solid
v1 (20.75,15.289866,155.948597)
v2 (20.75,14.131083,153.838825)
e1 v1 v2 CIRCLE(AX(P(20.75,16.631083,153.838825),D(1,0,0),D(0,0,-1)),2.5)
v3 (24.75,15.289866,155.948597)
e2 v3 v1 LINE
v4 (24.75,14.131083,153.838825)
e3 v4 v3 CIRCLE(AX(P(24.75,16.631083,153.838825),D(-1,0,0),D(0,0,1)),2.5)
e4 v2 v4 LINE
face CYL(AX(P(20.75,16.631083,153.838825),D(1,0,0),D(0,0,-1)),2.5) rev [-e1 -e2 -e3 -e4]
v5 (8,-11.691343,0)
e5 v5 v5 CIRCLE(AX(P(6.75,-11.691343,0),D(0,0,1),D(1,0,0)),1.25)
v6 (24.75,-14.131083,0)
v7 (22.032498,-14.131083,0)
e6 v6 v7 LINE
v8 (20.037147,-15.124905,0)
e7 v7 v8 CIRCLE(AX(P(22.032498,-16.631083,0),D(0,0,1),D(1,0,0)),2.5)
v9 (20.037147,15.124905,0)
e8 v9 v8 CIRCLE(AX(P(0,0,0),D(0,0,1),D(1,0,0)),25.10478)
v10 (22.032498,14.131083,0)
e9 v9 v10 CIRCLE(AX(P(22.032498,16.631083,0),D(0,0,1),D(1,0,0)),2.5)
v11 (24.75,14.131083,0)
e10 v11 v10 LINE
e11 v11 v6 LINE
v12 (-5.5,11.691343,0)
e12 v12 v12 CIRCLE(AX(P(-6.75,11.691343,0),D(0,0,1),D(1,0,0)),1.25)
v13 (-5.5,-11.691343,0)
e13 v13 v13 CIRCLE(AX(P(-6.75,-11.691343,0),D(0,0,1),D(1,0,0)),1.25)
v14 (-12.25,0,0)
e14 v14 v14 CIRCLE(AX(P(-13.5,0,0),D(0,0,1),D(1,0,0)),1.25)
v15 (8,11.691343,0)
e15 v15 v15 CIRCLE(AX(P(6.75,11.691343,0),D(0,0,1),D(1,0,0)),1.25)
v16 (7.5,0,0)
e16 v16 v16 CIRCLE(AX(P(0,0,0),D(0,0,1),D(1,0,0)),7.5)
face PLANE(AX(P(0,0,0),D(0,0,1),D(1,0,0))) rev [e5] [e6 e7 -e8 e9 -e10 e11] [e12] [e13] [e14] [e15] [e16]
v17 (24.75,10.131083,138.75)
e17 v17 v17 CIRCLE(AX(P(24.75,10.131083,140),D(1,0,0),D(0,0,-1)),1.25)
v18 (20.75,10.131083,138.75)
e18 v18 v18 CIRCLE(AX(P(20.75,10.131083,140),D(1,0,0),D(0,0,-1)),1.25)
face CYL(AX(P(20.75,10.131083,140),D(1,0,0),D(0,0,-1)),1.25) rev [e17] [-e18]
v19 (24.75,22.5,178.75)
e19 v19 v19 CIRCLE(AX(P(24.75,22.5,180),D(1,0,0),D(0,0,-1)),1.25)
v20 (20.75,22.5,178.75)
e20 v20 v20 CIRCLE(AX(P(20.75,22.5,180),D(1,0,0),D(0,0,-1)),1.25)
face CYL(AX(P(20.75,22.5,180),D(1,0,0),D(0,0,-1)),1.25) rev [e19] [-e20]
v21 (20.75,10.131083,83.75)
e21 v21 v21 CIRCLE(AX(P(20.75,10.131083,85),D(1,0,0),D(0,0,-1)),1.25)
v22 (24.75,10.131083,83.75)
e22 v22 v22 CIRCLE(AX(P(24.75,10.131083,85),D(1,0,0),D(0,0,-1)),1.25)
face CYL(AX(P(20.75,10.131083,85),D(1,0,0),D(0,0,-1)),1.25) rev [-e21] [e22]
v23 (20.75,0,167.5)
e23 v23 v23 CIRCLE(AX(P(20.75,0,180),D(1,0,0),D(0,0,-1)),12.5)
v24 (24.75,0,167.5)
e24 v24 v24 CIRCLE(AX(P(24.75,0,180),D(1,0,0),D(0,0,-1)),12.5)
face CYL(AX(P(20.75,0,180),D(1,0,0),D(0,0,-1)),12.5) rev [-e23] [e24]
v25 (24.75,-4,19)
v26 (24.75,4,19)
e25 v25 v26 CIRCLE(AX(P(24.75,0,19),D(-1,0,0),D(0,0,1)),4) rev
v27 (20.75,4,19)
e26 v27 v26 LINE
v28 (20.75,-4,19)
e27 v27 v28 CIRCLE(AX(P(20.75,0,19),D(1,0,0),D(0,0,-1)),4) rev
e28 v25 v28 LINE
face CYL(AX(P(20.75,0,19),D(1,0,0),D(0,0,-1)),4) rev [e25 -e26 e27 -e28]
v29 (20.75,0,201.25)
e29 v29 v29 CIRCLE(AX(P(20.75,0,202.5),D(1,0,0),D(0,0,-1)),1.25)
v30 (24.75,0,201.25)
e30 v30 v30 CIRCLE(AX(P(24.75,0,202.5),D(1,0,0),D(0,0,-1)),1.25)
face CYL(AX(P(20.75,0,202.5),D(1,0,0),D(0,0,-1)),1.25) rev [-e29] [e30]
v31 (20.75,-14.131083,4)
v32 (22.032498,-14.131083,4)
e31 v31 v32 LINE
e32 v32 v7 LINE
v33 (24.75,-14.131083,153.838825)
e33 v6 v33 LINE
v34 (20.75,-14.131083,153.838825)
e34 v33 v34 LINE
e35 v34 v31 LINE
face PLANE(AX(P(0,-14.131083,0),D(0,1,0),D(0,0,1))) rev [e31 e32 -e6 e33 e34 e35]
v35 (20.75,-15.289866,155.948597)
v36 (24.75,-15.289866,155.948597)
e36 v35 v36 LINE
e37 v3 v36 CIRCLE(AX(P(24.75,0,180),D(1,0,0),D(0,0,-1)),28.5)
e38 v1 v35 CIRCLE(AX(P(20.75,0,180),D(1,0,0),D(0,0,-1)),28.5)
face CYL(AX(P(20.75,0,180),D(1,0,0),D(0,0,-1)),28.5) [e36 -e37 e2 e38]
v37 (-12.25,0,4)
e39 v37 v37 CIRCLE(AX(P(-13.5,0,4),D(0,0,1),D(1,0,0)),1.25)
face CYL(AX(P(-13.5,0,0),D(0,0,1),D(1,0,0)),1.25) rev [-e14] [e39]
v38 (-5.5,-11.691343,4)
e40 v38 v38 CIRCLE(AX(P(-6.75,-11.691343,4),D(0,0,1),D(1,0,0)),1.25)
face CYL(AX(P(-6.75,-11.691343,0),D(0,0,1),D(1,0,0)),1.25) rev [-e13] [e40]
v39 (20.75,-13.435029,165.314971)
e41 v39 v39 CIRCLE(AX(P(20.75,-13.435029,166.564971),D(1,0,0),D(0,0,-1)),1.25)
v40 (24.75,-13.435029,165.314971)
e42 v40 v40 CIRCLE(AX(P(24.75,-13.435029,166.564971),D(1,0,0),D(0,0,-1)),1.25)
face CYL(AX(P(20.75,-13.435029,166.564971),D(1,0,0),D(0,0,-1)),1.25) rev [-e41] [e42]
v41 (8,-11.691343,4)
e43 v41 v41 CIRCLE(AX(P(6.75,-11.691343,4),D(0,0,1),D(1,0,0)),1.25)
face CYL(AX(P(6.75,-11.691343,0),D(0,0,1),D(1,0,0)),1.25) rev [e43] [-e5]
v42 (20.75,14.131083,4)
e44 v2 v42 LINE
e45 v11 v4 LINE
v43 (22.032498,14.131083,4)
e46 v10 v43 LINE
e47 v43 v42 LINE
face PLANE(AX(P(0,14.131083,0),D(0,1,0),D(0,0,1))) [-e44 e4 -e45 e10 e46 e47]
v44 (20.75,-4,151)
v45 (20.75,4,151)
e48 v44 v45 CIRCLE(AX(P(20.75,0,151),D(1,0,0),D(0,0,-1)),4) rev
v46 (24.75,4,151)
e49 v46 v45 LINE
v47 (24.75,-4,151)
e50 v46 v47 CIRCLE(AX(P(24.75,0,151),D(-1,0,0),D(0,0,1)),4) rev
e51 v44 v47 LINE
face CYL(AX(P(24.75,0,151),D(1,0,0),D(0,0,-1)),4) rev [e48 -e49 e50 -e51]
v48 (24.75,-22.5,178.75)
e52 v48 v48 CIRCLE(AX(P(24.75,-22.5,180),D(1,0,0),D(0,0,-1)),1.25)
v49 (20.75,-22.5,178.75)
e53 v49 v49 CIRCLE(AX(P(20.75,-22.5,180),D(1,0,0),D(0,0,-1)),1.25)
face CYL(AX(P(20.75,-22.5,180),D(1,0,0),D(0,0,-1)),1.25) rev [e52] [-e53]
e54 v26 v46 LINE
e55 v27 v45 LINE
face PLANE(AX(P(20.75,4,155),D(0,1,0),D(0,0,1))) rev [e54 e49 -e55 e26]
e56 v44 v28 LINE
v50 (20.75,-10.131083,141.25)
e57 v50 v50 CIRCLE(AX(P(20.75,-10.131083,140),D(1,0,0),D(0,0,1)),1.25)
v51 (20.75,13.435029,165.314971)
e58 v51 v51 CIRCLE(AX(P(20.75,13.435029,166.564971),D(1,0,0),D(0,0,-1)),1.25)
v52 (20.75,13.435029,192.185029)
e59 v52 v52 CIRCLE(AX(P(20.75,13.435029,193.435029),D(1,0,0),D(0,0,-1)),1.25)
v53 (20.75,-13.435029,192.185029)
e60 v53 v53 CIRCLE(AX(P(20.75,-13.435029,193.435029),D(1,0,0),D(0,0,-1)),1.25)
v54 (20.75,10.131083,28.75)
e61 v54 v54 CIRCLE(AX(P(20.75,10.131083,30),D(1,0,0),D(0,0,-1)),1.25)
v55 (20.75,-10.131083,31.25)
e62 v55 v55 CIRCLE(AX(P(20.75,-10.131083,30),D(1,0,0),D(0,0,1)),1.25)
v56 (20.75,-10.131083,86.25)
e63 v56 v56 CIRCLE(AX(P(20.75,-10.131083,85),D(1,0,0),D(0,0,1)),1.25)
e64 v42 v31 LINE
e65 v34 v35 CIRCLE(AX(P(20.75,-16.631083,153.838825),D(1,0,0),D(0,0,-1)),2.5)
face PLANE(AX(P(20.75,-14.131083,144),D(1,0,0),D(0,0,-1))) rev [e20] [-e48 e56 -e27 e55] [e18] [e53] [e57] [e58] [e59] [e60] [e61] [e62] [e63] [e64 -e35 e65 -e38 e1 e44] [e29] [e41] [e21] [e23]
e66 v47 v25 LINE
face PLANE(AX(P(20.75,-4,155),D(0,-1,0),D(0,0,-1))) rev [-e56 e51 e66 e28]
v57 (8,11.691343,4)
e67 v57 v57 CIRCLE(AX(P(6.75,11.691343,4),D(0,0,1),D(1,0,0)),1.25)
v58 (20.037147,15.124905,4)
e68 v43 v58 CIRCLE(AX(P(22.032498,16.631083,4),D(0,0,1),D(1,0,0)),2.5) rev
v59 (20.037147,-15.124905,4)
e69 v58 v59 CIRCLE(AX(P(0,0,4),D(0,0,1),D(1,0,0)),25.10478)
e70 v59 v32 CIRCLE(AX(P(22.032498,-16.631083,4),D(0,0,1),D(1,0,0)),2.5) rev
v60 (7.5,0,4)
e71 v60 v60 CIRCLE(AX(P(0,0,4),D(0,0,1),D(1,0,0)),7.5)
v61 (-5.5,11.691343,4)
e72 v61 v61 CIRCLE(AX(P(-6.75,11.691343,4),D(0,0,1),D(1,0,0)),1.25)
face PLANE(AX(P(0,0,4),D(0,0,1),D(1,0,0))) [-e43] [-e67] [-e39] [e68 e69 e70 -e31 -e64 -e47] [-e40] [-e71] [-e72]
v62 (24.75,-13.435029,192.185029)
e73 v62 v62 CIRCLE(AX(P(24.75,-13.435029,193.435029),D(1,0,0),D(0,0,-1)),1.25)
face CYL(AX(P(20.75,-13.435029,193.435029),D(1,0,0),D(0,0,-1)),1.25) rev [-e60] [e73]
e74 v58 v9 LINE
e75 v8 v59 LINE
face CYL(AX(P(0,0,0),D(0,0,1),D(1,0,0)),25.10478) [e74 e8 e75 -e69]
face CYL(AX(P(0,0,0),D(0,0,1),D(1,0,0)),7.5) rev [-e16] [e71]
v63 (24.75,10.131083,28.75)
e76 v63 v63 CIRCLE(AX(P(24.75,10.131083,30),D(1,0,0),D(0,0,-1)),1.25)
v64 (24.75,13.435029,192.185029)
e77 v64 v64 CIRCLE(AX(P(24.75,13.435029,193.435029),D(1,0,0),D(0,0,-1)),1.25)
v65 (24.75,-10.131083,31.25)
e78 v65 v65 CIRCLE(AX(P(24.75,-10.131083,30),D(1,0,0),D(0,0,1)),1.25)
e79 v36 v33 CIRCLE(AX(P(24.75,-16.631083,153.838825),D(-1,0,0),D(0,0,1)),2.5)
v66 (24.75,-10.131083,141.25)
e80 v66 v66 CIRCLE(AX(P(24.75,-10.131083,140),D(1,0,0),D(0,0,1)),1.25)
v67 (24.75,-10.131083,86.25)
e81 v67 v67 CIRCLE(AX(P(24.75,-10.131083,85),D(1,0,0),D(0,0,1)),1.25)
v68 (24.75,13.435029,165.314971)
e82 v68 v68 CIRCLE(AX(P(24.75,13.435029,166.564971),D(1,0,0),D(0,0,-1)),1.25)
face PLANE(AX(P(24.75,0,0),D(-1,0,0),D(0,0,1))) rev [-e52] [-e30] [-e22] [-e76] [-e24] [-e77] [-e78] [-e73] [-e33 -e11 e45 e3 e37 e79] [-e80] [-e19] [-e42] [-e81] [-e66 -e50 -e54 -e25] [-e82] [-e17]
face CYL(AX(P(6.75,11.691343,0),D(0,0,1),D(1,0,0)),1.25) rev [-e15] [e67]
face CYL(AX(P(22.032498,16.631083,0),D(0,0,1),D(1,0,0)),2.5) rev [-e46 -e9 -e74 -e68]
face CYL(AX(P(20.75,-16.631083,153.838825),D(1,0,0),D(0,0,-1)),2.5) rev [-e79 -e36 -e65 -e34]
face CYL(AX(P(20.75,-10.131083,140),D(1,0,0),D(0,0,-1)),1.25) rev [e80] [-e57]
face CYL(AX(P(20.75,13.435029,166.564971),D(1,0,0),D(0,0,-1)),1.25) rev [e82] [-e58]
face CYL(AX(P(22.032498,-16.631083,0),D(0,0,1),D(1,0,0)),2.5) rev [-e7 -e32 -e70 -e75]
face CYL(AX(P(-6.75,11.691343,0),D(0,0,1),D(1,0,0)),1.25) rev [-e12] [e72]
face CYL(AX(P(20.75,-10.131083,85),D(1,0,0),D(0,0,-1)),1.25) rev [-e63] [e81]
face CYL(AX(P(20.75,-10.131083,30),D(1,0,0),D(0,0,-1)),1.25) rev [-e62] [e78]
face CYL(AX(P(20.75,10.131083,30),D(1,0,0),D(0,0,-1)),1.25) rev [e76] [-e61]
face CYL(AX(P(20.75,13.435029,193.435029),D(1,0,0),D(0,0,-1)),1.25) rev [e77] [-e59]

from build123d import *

# Parameters (mm, degrees)
SKETCH_1_R          = 28.5
EXTRUDE_1_DEPTH     = 4
SKETCH_2_R          = 1.25
CUT_EXTRUDE_2_DEPTH = 4
CUT_EXTRUDE_START   = -4
CUT_EXTRUDE_4_DEPTH = 4
SKETCH_5_R          = 7.5
CUT_EXTRUDE_5_DEPTH = 4
SKETCH_6_W          = 4
SKETCH_6_H          = 28.262165522
EXTRUDE_2_DEPTH     = 140
SKETCH_7_R          = 12.5
EXTRUDE_3_DEPTH     = 4
SKETCH_8_R          = 1.25
CUT_EXTRUDE_6_DEPTH = 4
SKETCH_9_R          = 1.25
SKETCH_9_W          = 140
SKETCH_9_H          = 8
CUT_EXTRUDE_7_DEPTH = 4
FILLET_1_R          = 4
FILLET_2_R          = 4
FILLET_3_R          = 2.5


with BuildPart() as part:
    # 草图1 → 凸台-拉伸1 (new body)
    with BuildSketch(Plane.XY):
        Circle(SKETCH_1_R)
    extrude(amount=EXTRUDE_1_DEPTH)

    # 草图2 → 切除-拉伸2 (cut)
    with BuildSketch(Plane.XY.offset(4)):
        with Locations((-13.5, 0)):
            Circle(SKETCH_2_R)
        with Locations((-6.75, 11.691342951)):
            Circle(SKETCH_2_R)
        with Locations((6.75, 11.691342951)):
            Circle(SKETCH_2_R)
        with Locations((6.75, -11.691342951)):
            Circle(SKETCH_2_R)
        with Locations((-6.75, -11.691342951)):
            Circle(SKETCH_2_R)
    extrude(amount=-CUT_EXTRUDE_2_DEPTH, mode=Mode.SUBTRACT)

    # 草图4 → 切除-拉伸4 (cut)
    with BuildSketch(Plane.XY.offset(4).offset(CUT_EXTRUDE_START)):
        with BuildLine():
            ThreePointArc((20.75, -14.131082761), (-25.104780421, 0), (20.75, 14.131082761))
            Line((20.75, 14.131082761), (24.75, 14.131082761))
            ThreePointArc((24.75, 14.131082761), (-28.5, 0), (24.75, -14.131082761))
            Line((24.75, -14.131082761), (20.75, -14.131082761))
        make_face()
        with BuildLine():
            Line((24.75, 14.131082761), (24.75, 0))
            Line((24.75, 0), (28.5, 0))
            ThreePointArc((28.5, 0), (27.546551508, 7.310095759), (24.75, 14.131082761))
        make_face()
        with BuildLine():
            Line((28.5, 0), (24.75, 0))
            Line((24.75, 0), (24.75, -14.131082761))
            ThreePointArc((24.75, -14.131082761), (27.546551508, -7.310095759), (28.5, 0))
        make_face()
    extrude(amount=CUT_EXTRUDE_4_DEPTH, mode=Mode.SUBTRACT)

    # 草图5 → 切除-拉伸5 (cut)
    with BuildSketch(Plane.XY.offset(4)):
        Circle(SKETCH_5_R)
    extrude(amount=-CUT_EXTRUDE_5_DEPTH, mode=Mode.SUBTRACT)

    # 草图6 → 凸台-拉伸2 (add)
    with BuildSketch(Plane.XY.offset(4)):
        with Locations((22.75, 0)):
            Rectangle(SKETCH_6_W, SKETCH_6_H)
    extrude(amount=EXTRUDE_2_DEPTH)

    # 草图7 → 凸台-拉伸3 (add)
    with BuildSketch(Plane(origin=(24.75, 0, 0), x_dir=(0, 0, -1), z_dir=(1, 0, 0))):
        with BuildLine():
            Line((-144, 14.131082761), (-155.25, 14.131082761))
            ThreePointArc((-155.25, 14.131082761), (-208.5, 0), (-155.25, -14.131082761))
            Line((-155.25, -14.131082761), (-144, -14.131082761))
            Line((-144, -14.131082761), (-144, 14.131082761))
        make_face()
        with Locations((-180, 0)):
            Circle(SKETCH_7_R, mode=Mode.SUBTRACT)
    extrude(amount=-EXTRUDE_3_DEPTH)

    # 草图8 → 切除-拉伸6 (cut)
    with BuildSketch(Plane(origin=(24.75, 0, 0), x_dir=(0, 0, -1), z_dir=(1, 0, 0))):
        with Locations((-166.564971157, 13.435028843)):
            Circle(SKETCH_8_R)
        with Locations((-166.564971157, -13.435028843)):
            Circle(SKETCH_8_R)
        with Locations((-193.435028843, -13.435028843)):
            Circle(SKETCH_8_R)
        with Locations((-193.435028843, 13.435028843)):
            Circle(SKETCH_8_R)
    extrude(amount=-CUT_EXTRUDE_6_DEPTH, mode=Mode.SUBTRACT)

    # 草图9 → 切除-拉伸7 (cut)
    with BuildSketch(Plane(origin=(24.75, 0, 0), x_dir=(0, 0, -1), z_dir=(1, 0, 0))):
        with Locations((-140, 10.131082761)):
            Circle(SKETCH_9_R)
        with Locations((-180, 22.5)):
            Circle(SKETCH_9_R)
        with Locations((-202.5, 0)):
            Circle(SKETCH_9_R)
        with Locations((-180, -22.5)):
            Circle(SKETCH_9_R)
        with Locations((-85, 10.131082761)):
            Circle(SKETCH_9_R)
        with Locations((-30, 10.131082761)):
            Circle(SKETCH_9_R)
        with Locations(Location((-30, -10.131082761, 0), (0, 0, 180))):
            Circle(SKETCH_9_R)
        with Locations(Location((-85, -10.131082761, 0), (0, 0, 180))):
            Circle(SKETCH_9_R)
        with Locations(Location((-140, -10.131082761, 0), (0, 0, 180))):
            Circle(SKETCH_9_R)
        with Locations((-85, 0)):
            Rectangle(SKETCH_9_W, SKETCH_9_H)
    extrude(amount=-CUT_EXTRUDE_7_DEPTH, mode=Mode.SUBTRACT)

    # 圆角1
    fillet_1_edges = [part.edges().sort_by_distance(p)[0] for p in [
        (22.75, -4, 155),
        (22.75, 4, 155),
    ]]
    fillet(fillet_1_edges, radius=FILLET_1_R - 0.0001)  # a hair under: the kernel refuses the full size

    # 圆角2
    fillet_2_edges = [part.edges().sort_by_distance(p)[0] for p in [
        (22.75, 4, 15),
        (22.75, -4, 15),
    ]]
    fillet(fillet_2_edges, radius=FILLET_2_R - 0.0001)  # a hair under: the kernel refuses the full size

    # 圆角3
    fillet_3_edges = [part.edges().sort_by_distance(p)[0] for p in [
        (22.75, -14.131082761, 155.25),
        (22.75, 14.131082761, 155.25),
        (20.75, -14.131082761, 2),
        (20.75, 14.131082761, 2),
    ]]
    fillet(fillet_3_edges, radius=FILLET_3_R)


solid = part.part
